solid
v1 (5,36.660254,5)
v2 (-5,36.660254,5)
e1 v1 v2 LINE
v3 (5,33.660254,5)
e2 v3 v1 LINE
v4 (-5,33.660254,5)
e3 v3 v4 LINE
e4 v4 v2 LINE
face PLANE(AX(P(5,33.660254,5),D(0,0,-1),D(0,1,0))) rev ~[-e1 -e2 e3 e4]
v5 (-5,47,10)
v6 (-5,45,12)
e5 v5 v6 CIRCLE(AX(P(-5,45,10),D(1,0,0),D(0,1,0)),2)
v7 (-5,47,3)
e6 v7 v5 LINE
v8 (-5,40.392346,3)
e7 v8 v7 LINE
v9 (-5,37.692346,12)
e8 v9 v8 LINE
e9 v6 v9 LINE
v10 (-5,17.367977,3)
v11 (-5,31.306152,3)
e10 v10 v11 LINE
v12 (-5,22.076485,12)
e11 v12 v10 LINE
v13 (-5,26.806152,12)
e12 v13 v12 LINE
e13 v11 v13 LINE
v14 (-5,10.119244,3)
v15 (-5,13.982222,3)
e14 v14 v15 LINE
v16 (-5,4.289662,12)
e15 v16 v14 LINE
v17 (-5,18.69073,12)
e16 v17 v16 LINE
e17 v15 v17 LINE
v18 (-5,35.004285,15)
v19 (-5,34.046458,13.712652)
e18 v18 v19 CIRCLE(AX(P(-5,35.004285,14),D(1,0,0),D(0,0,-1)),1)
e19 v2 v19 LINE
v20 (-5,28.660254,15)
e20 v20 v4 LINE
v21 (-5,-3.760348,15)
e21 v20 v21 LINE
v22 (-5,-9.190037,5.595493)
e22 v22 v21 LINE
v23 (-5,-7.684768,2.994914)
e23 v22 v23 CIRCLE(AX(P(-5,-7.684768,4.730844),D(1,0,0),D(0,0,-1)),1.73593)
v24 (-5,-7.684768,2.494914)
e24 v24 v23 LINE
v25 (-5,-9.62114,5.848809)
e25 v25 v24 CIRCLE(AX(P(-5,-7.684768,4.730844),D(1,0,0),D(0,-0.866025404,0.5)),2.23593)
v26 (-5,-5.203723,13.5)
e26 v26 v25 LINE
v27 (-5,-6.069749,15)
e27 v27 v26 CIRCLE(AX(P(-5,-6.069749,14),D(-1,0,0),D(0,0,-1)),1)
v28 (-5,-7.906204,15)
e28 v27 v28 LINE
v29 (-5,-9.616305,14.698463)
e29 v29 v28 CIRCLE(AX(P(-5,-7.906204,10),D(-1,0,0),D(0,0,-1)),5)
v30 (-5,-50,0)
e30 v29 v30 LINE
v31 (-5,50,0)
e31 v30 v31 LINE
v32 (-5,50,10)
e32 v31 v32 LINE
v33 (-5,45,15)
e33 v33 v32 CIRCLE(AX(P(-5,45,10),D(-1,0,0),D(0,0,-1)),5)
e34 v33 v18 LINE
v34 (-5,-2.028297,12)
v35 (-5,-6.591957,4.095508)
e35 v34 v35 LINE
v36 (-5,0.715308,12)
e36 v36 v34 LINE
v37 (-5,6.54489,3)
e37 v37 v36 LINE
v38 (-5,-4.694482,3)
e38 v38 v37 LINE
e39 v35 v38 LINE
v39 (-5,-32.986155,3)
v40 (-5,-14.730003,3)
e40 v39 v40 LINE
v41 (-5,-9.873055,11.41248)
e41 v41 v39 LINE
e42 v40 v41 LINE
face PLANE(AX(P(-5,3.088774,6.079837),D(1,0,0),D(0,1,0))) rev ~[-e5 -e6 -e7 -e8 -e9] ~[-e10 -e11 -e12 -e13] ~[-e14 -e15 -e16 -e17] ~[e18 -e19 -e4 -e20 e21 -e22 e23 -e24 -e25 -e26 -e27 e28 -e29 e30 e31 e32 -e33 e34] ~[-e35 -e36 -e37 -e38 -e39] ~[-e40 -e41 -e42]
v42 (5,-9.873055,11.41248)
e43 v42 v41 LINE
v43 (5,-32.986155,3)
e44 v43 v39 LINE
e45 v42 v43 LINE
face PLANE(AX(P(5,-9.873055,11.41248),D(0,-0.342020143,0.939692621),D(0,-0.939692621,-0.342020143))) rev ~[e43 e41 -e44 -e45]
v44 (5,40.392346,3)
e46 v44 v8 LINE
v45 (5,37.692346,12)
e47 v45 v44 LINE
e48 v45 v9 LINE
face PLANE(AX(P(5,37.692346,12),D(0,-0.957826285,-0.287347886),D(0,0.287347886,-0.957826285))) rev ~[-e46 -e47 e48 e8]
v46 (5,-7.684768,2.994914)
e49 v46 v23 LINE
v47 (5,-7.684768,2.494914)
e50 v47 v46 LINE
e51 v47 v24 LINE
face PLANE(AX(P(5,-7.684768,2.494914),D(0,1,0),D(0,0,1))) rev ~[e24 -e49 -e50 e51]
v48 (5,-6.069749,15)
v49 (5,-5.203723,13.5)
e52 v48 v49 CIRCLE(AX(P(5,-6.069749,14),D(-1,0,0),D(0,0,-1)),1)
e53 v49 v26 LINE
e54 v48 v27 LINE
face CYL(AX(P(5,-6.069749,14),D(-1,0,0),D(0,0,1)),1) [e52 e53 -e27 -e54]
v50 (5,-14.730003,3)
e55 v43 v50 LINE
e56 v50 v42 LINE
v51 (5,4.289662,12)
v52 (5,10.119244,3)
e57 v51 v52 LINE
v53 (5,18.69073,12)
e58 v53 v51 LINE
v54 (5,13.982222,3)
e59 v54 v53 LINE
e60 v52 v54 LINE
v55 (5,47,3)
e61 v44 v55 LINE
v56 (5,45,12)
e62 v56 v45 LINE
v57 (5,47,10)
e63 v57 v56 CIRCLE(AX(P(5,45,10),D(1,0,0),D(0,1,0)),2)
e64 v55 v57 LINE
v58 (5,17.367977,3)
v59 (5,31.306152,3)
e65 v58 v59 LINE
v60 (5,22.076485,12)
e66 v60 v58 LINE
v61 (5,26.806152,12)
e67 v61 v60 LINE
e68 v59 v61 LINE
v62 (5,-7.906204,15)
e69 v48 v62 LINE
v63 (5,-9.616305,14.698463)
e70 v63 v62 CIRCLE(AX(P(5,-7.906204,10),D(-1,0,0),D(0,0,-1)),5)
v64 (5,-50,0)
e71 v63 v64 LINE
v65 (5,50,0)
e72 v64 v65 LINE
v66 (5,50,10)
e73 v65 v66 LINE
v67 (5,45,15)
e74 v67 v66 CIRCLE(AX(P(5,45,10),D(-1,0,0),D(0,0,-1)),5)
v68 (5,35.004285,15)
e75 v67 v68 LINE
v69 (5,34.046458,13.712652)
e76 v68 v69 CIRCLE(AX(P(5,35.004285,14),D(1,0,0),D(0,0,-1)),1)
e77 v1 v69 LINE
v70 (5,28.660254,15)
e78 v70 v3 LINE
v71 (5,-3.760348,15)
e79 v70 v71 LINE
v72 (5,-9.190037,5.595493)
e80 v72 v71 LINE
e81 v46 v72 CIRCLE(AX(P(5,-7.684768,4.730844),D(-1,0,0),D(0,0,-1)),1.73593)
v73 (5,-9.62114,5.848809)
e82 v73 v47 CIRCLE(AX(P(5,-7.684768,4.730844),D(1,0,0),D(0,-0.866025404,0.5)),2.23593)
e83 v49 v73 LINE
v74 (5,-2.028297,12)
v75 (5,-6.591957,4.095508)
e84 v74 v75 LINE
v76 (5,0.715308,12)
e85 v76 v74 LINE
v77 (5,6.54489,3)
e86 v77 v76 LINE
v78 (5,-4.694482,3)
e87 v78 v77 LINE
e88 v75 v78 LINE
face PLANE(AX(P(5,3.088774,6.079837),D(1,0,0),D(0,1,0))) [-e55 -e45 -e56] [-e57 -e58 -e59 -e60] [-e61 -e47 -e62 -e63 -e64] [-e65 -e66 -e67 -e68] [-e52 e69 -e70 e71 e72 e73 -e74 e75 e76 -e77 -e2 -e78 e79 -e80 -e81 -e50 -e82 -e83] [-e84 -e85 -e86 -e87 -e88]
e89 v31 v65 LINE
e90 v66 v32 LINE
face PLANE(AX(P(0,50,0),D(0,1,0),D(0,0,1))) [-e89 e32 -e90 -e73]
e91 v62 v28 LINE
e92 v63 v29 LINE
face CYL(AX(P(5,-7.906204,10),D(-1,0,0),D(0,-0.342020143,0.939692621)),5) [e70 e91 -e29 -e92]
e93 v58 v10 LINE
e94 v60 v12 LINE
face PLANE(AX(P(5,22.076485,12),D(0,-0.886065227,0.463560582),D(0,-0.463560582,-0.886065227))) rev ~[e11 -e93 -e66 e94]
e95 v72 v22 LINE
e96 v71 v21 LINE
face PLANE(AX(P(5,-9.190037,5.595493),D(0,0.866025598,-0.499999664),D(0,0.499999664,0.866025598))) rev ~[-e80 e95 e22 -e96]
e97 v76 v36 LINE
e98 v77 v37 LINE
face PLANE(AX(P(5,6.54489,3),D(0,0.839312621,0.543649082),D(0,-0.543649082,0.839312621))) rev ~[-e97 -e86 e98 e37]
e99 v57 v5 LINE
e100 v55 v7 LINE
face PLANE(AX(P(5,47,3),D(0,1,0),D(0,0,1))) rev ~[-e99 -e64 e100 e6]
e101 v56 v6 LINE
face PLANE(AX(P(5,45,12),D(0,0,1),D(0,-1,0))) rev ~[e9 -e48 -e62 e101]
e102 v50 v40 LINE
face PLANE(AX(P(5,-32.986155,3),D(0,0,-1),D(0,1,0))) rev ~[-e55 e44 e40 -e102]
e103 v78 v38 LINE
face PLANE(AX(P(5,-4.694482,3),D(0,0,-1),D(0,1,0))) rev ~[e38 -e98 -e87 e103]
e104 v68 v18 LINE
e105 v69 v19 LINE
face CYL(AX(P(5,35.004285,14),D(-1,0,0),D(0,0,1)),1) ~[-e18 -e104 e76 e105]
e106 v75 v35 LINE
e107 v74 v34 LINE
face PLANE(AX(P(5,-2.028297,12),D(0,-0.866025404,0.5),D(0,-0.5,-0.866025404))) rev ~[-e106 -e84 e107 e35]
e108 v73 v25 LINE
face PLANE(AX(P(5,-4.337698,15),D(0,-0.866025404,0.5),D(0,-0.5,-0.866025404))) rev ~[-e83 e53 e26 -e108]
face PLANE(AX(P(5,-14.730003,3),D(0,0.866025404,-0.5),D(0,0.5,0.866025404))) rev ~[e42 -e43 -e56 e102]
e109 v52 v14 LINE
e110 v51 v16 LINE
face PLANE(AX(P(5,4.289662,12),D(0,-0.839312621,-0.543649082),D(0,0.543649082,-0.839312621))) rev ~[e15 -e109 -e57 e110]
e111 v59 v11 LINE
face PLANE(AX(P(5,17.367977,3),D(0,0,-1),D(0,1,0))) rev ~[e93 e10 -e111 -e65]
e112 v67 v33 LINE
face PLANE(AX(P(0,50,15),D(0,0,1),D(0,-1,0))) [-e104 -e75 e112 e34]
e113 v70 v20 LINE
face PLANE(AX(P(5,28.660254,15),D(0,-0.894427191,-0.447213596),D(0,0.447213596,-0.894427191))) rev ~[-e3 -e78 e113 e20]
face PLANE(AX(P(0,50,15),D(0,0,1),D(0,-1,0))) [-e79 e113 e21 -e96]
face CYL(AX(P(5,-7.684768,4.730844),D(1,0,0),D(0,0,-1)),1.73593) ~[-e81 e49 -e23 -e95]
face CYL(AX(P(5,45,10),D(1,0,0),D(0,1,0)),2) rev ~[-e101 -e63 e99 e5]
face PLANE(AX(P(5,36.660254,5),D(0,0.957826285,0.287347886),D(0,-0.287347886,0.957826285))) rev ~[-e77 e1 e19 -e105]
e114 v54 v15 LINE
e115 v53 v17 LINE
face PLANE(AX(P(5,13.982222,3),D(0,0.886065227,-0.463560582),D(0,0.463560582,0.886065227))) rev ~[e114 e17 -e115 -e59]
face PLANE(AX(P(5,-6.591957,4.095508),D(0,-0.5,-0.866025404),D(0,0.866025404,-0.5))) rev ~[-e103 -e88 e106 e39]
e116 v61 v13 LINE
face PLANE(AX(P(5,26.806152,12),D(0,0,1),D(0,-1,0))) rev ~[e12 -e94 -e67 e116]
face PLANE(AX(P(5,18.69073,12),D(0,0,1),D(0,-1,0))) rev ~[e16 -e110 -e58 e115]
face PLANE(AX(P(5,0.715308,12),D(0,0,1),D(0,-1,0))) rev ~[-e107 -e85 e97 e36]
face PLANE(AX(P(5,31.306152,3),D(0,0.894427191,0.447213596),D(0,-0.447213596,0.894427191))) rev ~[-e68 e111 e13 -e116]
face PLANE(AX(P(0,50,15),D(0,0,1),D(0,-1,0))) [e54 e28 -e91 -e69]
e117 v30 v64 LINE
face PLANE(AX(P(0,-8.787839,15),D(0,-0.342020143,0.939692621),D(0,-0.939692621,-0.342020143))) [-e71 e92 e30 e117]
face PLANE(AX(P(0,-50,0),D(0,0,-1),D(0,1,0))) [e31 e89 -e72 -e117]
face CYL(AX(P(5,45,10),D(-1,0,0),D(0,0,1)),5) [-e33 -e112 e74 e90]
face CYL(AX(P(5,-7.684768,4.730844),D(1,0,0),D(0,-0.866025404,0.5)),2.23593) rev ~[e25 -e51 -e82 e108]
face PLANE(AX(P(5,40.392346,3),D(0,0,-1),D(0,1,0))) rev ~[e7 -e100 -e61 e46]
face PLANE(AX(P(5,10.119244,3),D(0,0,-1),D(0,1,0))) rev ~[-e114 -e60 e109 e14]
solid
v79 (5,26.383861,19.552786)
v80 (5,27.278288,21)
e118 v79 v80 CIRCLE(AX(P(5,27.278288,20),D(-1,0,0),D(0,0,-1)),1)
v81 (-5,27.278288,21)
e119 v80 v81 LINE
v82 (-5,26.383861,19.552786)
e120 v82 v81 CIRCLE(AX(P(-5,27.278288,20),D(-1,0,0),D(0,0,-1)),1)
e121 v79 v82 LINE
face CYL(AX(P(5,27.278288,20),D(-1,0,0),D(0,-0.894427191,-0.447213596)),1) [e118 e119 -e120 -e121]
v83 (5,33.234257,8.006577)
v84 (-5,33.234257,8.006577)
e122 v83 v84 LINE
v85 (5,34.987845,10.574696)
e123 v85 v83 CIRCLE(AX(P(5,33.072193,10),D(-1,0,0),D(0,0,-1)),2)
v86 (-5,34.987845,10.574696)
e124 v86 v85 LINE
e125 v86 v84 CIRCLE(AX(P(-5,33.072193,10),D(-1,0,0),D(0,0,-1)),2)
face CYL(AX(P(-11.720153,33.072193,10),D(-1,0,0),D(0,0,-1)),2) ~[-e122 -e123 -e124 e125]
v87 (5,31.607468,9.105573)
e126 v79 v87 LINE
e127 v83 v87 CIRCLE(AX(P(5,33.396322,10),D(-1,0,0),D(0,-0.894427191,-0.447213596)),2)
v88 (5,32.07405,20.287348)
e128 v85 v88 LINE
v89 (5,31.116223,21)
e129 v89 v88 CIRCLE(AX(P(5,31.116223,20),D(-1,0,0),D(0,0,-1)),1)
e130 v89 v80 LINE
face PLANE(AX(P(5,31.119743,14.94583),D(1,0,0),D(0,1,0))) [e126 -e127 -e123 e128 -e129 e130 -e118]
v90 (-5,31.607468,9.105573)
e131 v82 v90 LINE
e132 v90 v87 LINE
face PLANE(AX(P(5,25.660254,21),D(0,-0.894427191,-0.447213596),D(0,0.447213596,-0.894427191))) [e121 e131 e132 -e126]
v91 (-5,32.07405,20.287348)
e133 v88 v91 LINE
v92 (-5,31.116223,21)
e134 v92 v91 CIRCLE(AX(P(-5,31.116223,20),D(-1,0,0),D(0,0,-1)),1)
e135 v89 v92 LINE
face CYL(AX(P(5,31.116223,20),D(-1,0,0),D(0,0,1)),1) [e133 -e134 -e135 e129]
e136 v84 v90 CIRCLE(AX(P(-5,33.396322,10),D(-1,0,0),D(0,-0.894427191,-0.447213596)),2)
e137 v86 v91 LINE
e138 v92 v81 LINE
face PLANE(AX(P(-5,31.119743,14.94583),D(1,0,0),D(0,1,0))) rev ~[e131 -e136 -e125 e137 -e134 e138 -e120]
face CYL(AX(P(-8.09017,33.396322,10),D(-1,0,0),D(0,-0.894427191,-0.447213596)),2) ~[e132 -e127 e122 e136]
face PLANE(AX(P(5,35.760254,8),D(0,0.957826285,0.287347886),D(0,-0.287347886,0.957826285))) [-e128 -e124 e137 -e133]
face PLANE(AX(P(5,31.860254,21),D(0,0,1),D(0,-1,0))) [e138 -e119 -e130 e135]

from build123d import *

# Parameters (mm, degrees)
F1_DEPTH     = 5
F2_R         = 5
F4_DEPTH     = 25
F6_DEPTH     = 10
F8_DEPTH     = 25
F9_R         = 1
F10_T1_DEPTH = 16.1803398875
F10_T3_DEPTH = 23.4403065089
F11_R        = 1


# Not quite as in the source:
# - a fillet or chamfer that OpenCascade refuses, or shapes differently, is made with other operations: its cross-section is extruded or revolved along the edge and cut away or added
# - ends of sketch curves that miss each other by under 0.0002 mm in the source are joined


with BuildPart() as f1:
    # F0 (on Right) → F1 (new body, symmetric)
    with BuildSketch(Plane.YZ):
        Polygon((-8.7878387082, 15), (-50, 0), (50, 0), (50, 15), align=None)
    extrude(amount=F1_DEPTH, both=True)

    # F2
    f2_edges = [f1.edges().sort_by_distance(p)[0] for p in [
        (0, 50, 15),
        (0, -8.787839, 15),
    ]]
    fillet(f2_edges, radius=F2_R)

    # F3 (on face) → F4 (cut)
    with BuildSketch(Plane.YZ.offset(5)):
        with BuildLine():
            Line((-3.7603476085, 15), (-4.3376978777, 15))
            Line((-4.3376978777, 15), (-9.6211402319, 5.8488094036))
            ThreePointArc((-9.6211402319, 5.8488094036), (-9.6211402319, 3.6128792242), (-7.6847678955, 2.4949141345))
            Line((-7.6847678955, 2.4949141345), (-7.6847678955, 2.9949141345))
            ThreePointArc((-7.6847678955, 2.9949141345), (-9.1871699303, 3.8612227218), (-9.190037249, 5.5954932374))
            Line((-9.190037249, 5.5954932374), (-3.7603476085, 15))
        make_face()
        Polygon((33.6602540378, 15), (28.6602540378, 15), (33.6602540378, 5), (36.6602540378, 5), align=None)
    extrude(amount=-F4_DEPTH, mode=Mode.SUBTRACT)

    # F7 (on face) → F8 (cut)
    with BuildSketch(Plane.YZ.offset(5)):
        Polygon((22.076485224, 12), (17.3679771944, 3), (31.3061520716, 3), (26.8061520716, 12), align=None)
        Polygon((4.2896619261, 12), (10.1192439169, 3), (13.9822219387, 3), (18.6907299683, 12), align=None)
        Polygon((-6.5919574173, 4.095507944), (-4.6944819983, 3), (6.5448904216, 3), (0.7153084307, 12), (-2.0282968009, 12), align=None)
        Polygon((-9.8730549791, 11.4124802622), (-32.9861545411, 3), (-14.7300027231, 3), align=None)
        with BuildLine():
            Line((45, 12), (37.6923459905, 12))
            Line((37.6923459905, 12), (40.3923459905, 3))
            Line((40.3923459905, 3), (47, 3))
            Line((47, 3), (47, 10))
            ThreePointArc((47, 10), (46.4142135624, 11.4142135624), (45, 12))
        make_face()
    extrude(amount=-F8_DEPTH, mode=Mode.SUBTRACT)

    # F9
    f9_edges = [f1.edges().sort_by_distance(p)[0] for p in [
        (0, -4.337698, 15),
        (0, 33.660254, 15),
    ]]
    fillet(f9_edges, radius=F9_R)


with BuildPart() as f6:
    # F5 (on face) → F6 (new body)
    with BuildSketch(Plane.YZ.offset(5)):
        Polygon((25.6602540378, 21), (32.1602540378, 8), (35.7602540378, 8), (31.8602540378, 21), align=None)
    extrude(amount=-F6_DEPTH)

    # F10: fillet of radius 2 on 2 edges, made by hand

    # F10_s2 → F10_t1 (cut)
    with BuildSketch(Plane.YZ.offset(-8.0901699437)):
        with BuildLine():
            ThreePointArc((31.6074676333, 9.105572809), (32.3448597911, 8.2986983833), (33.3963220153, 8))
            Line((33.3963220153, 8), (32.1602540378, 8))
            Line((32.1602540378, 8), (31.6074676333, 9.105572809))
        make_face()
    extrude(amount=F10_T1_DEPTH, mode=Mode.SUBTRACT)

    # F10_s4 → F10_t3 (cut)
    with BuildSketch(Plane.YZ.offset(-11.7201532545)):
        with BuildLine():
            ThreePointArc((33.0721927361, 8), (34.6767785926, 8.8061389407), (34.9878453065, 10.5746957711))
            Line((34.9878453065, 10.5746957711), (35.7602540378, 8))
            Line((35.7602540378, 8), (33.0721927361, 8))
        make_face()
    extrude(amount=F10_T3_DEPTH, mode=Mode.SUBTRACT)

    # F11
    f11_edges = [f6.edges().sort_by_distance(p)[0] for p in [
        (0, 25.660254, 21),
        (0, 31.860254, 21),
    ]]
    fillet(f11_edges, radius=F11_R)


solid = Compound([f1.part, f6.part])
